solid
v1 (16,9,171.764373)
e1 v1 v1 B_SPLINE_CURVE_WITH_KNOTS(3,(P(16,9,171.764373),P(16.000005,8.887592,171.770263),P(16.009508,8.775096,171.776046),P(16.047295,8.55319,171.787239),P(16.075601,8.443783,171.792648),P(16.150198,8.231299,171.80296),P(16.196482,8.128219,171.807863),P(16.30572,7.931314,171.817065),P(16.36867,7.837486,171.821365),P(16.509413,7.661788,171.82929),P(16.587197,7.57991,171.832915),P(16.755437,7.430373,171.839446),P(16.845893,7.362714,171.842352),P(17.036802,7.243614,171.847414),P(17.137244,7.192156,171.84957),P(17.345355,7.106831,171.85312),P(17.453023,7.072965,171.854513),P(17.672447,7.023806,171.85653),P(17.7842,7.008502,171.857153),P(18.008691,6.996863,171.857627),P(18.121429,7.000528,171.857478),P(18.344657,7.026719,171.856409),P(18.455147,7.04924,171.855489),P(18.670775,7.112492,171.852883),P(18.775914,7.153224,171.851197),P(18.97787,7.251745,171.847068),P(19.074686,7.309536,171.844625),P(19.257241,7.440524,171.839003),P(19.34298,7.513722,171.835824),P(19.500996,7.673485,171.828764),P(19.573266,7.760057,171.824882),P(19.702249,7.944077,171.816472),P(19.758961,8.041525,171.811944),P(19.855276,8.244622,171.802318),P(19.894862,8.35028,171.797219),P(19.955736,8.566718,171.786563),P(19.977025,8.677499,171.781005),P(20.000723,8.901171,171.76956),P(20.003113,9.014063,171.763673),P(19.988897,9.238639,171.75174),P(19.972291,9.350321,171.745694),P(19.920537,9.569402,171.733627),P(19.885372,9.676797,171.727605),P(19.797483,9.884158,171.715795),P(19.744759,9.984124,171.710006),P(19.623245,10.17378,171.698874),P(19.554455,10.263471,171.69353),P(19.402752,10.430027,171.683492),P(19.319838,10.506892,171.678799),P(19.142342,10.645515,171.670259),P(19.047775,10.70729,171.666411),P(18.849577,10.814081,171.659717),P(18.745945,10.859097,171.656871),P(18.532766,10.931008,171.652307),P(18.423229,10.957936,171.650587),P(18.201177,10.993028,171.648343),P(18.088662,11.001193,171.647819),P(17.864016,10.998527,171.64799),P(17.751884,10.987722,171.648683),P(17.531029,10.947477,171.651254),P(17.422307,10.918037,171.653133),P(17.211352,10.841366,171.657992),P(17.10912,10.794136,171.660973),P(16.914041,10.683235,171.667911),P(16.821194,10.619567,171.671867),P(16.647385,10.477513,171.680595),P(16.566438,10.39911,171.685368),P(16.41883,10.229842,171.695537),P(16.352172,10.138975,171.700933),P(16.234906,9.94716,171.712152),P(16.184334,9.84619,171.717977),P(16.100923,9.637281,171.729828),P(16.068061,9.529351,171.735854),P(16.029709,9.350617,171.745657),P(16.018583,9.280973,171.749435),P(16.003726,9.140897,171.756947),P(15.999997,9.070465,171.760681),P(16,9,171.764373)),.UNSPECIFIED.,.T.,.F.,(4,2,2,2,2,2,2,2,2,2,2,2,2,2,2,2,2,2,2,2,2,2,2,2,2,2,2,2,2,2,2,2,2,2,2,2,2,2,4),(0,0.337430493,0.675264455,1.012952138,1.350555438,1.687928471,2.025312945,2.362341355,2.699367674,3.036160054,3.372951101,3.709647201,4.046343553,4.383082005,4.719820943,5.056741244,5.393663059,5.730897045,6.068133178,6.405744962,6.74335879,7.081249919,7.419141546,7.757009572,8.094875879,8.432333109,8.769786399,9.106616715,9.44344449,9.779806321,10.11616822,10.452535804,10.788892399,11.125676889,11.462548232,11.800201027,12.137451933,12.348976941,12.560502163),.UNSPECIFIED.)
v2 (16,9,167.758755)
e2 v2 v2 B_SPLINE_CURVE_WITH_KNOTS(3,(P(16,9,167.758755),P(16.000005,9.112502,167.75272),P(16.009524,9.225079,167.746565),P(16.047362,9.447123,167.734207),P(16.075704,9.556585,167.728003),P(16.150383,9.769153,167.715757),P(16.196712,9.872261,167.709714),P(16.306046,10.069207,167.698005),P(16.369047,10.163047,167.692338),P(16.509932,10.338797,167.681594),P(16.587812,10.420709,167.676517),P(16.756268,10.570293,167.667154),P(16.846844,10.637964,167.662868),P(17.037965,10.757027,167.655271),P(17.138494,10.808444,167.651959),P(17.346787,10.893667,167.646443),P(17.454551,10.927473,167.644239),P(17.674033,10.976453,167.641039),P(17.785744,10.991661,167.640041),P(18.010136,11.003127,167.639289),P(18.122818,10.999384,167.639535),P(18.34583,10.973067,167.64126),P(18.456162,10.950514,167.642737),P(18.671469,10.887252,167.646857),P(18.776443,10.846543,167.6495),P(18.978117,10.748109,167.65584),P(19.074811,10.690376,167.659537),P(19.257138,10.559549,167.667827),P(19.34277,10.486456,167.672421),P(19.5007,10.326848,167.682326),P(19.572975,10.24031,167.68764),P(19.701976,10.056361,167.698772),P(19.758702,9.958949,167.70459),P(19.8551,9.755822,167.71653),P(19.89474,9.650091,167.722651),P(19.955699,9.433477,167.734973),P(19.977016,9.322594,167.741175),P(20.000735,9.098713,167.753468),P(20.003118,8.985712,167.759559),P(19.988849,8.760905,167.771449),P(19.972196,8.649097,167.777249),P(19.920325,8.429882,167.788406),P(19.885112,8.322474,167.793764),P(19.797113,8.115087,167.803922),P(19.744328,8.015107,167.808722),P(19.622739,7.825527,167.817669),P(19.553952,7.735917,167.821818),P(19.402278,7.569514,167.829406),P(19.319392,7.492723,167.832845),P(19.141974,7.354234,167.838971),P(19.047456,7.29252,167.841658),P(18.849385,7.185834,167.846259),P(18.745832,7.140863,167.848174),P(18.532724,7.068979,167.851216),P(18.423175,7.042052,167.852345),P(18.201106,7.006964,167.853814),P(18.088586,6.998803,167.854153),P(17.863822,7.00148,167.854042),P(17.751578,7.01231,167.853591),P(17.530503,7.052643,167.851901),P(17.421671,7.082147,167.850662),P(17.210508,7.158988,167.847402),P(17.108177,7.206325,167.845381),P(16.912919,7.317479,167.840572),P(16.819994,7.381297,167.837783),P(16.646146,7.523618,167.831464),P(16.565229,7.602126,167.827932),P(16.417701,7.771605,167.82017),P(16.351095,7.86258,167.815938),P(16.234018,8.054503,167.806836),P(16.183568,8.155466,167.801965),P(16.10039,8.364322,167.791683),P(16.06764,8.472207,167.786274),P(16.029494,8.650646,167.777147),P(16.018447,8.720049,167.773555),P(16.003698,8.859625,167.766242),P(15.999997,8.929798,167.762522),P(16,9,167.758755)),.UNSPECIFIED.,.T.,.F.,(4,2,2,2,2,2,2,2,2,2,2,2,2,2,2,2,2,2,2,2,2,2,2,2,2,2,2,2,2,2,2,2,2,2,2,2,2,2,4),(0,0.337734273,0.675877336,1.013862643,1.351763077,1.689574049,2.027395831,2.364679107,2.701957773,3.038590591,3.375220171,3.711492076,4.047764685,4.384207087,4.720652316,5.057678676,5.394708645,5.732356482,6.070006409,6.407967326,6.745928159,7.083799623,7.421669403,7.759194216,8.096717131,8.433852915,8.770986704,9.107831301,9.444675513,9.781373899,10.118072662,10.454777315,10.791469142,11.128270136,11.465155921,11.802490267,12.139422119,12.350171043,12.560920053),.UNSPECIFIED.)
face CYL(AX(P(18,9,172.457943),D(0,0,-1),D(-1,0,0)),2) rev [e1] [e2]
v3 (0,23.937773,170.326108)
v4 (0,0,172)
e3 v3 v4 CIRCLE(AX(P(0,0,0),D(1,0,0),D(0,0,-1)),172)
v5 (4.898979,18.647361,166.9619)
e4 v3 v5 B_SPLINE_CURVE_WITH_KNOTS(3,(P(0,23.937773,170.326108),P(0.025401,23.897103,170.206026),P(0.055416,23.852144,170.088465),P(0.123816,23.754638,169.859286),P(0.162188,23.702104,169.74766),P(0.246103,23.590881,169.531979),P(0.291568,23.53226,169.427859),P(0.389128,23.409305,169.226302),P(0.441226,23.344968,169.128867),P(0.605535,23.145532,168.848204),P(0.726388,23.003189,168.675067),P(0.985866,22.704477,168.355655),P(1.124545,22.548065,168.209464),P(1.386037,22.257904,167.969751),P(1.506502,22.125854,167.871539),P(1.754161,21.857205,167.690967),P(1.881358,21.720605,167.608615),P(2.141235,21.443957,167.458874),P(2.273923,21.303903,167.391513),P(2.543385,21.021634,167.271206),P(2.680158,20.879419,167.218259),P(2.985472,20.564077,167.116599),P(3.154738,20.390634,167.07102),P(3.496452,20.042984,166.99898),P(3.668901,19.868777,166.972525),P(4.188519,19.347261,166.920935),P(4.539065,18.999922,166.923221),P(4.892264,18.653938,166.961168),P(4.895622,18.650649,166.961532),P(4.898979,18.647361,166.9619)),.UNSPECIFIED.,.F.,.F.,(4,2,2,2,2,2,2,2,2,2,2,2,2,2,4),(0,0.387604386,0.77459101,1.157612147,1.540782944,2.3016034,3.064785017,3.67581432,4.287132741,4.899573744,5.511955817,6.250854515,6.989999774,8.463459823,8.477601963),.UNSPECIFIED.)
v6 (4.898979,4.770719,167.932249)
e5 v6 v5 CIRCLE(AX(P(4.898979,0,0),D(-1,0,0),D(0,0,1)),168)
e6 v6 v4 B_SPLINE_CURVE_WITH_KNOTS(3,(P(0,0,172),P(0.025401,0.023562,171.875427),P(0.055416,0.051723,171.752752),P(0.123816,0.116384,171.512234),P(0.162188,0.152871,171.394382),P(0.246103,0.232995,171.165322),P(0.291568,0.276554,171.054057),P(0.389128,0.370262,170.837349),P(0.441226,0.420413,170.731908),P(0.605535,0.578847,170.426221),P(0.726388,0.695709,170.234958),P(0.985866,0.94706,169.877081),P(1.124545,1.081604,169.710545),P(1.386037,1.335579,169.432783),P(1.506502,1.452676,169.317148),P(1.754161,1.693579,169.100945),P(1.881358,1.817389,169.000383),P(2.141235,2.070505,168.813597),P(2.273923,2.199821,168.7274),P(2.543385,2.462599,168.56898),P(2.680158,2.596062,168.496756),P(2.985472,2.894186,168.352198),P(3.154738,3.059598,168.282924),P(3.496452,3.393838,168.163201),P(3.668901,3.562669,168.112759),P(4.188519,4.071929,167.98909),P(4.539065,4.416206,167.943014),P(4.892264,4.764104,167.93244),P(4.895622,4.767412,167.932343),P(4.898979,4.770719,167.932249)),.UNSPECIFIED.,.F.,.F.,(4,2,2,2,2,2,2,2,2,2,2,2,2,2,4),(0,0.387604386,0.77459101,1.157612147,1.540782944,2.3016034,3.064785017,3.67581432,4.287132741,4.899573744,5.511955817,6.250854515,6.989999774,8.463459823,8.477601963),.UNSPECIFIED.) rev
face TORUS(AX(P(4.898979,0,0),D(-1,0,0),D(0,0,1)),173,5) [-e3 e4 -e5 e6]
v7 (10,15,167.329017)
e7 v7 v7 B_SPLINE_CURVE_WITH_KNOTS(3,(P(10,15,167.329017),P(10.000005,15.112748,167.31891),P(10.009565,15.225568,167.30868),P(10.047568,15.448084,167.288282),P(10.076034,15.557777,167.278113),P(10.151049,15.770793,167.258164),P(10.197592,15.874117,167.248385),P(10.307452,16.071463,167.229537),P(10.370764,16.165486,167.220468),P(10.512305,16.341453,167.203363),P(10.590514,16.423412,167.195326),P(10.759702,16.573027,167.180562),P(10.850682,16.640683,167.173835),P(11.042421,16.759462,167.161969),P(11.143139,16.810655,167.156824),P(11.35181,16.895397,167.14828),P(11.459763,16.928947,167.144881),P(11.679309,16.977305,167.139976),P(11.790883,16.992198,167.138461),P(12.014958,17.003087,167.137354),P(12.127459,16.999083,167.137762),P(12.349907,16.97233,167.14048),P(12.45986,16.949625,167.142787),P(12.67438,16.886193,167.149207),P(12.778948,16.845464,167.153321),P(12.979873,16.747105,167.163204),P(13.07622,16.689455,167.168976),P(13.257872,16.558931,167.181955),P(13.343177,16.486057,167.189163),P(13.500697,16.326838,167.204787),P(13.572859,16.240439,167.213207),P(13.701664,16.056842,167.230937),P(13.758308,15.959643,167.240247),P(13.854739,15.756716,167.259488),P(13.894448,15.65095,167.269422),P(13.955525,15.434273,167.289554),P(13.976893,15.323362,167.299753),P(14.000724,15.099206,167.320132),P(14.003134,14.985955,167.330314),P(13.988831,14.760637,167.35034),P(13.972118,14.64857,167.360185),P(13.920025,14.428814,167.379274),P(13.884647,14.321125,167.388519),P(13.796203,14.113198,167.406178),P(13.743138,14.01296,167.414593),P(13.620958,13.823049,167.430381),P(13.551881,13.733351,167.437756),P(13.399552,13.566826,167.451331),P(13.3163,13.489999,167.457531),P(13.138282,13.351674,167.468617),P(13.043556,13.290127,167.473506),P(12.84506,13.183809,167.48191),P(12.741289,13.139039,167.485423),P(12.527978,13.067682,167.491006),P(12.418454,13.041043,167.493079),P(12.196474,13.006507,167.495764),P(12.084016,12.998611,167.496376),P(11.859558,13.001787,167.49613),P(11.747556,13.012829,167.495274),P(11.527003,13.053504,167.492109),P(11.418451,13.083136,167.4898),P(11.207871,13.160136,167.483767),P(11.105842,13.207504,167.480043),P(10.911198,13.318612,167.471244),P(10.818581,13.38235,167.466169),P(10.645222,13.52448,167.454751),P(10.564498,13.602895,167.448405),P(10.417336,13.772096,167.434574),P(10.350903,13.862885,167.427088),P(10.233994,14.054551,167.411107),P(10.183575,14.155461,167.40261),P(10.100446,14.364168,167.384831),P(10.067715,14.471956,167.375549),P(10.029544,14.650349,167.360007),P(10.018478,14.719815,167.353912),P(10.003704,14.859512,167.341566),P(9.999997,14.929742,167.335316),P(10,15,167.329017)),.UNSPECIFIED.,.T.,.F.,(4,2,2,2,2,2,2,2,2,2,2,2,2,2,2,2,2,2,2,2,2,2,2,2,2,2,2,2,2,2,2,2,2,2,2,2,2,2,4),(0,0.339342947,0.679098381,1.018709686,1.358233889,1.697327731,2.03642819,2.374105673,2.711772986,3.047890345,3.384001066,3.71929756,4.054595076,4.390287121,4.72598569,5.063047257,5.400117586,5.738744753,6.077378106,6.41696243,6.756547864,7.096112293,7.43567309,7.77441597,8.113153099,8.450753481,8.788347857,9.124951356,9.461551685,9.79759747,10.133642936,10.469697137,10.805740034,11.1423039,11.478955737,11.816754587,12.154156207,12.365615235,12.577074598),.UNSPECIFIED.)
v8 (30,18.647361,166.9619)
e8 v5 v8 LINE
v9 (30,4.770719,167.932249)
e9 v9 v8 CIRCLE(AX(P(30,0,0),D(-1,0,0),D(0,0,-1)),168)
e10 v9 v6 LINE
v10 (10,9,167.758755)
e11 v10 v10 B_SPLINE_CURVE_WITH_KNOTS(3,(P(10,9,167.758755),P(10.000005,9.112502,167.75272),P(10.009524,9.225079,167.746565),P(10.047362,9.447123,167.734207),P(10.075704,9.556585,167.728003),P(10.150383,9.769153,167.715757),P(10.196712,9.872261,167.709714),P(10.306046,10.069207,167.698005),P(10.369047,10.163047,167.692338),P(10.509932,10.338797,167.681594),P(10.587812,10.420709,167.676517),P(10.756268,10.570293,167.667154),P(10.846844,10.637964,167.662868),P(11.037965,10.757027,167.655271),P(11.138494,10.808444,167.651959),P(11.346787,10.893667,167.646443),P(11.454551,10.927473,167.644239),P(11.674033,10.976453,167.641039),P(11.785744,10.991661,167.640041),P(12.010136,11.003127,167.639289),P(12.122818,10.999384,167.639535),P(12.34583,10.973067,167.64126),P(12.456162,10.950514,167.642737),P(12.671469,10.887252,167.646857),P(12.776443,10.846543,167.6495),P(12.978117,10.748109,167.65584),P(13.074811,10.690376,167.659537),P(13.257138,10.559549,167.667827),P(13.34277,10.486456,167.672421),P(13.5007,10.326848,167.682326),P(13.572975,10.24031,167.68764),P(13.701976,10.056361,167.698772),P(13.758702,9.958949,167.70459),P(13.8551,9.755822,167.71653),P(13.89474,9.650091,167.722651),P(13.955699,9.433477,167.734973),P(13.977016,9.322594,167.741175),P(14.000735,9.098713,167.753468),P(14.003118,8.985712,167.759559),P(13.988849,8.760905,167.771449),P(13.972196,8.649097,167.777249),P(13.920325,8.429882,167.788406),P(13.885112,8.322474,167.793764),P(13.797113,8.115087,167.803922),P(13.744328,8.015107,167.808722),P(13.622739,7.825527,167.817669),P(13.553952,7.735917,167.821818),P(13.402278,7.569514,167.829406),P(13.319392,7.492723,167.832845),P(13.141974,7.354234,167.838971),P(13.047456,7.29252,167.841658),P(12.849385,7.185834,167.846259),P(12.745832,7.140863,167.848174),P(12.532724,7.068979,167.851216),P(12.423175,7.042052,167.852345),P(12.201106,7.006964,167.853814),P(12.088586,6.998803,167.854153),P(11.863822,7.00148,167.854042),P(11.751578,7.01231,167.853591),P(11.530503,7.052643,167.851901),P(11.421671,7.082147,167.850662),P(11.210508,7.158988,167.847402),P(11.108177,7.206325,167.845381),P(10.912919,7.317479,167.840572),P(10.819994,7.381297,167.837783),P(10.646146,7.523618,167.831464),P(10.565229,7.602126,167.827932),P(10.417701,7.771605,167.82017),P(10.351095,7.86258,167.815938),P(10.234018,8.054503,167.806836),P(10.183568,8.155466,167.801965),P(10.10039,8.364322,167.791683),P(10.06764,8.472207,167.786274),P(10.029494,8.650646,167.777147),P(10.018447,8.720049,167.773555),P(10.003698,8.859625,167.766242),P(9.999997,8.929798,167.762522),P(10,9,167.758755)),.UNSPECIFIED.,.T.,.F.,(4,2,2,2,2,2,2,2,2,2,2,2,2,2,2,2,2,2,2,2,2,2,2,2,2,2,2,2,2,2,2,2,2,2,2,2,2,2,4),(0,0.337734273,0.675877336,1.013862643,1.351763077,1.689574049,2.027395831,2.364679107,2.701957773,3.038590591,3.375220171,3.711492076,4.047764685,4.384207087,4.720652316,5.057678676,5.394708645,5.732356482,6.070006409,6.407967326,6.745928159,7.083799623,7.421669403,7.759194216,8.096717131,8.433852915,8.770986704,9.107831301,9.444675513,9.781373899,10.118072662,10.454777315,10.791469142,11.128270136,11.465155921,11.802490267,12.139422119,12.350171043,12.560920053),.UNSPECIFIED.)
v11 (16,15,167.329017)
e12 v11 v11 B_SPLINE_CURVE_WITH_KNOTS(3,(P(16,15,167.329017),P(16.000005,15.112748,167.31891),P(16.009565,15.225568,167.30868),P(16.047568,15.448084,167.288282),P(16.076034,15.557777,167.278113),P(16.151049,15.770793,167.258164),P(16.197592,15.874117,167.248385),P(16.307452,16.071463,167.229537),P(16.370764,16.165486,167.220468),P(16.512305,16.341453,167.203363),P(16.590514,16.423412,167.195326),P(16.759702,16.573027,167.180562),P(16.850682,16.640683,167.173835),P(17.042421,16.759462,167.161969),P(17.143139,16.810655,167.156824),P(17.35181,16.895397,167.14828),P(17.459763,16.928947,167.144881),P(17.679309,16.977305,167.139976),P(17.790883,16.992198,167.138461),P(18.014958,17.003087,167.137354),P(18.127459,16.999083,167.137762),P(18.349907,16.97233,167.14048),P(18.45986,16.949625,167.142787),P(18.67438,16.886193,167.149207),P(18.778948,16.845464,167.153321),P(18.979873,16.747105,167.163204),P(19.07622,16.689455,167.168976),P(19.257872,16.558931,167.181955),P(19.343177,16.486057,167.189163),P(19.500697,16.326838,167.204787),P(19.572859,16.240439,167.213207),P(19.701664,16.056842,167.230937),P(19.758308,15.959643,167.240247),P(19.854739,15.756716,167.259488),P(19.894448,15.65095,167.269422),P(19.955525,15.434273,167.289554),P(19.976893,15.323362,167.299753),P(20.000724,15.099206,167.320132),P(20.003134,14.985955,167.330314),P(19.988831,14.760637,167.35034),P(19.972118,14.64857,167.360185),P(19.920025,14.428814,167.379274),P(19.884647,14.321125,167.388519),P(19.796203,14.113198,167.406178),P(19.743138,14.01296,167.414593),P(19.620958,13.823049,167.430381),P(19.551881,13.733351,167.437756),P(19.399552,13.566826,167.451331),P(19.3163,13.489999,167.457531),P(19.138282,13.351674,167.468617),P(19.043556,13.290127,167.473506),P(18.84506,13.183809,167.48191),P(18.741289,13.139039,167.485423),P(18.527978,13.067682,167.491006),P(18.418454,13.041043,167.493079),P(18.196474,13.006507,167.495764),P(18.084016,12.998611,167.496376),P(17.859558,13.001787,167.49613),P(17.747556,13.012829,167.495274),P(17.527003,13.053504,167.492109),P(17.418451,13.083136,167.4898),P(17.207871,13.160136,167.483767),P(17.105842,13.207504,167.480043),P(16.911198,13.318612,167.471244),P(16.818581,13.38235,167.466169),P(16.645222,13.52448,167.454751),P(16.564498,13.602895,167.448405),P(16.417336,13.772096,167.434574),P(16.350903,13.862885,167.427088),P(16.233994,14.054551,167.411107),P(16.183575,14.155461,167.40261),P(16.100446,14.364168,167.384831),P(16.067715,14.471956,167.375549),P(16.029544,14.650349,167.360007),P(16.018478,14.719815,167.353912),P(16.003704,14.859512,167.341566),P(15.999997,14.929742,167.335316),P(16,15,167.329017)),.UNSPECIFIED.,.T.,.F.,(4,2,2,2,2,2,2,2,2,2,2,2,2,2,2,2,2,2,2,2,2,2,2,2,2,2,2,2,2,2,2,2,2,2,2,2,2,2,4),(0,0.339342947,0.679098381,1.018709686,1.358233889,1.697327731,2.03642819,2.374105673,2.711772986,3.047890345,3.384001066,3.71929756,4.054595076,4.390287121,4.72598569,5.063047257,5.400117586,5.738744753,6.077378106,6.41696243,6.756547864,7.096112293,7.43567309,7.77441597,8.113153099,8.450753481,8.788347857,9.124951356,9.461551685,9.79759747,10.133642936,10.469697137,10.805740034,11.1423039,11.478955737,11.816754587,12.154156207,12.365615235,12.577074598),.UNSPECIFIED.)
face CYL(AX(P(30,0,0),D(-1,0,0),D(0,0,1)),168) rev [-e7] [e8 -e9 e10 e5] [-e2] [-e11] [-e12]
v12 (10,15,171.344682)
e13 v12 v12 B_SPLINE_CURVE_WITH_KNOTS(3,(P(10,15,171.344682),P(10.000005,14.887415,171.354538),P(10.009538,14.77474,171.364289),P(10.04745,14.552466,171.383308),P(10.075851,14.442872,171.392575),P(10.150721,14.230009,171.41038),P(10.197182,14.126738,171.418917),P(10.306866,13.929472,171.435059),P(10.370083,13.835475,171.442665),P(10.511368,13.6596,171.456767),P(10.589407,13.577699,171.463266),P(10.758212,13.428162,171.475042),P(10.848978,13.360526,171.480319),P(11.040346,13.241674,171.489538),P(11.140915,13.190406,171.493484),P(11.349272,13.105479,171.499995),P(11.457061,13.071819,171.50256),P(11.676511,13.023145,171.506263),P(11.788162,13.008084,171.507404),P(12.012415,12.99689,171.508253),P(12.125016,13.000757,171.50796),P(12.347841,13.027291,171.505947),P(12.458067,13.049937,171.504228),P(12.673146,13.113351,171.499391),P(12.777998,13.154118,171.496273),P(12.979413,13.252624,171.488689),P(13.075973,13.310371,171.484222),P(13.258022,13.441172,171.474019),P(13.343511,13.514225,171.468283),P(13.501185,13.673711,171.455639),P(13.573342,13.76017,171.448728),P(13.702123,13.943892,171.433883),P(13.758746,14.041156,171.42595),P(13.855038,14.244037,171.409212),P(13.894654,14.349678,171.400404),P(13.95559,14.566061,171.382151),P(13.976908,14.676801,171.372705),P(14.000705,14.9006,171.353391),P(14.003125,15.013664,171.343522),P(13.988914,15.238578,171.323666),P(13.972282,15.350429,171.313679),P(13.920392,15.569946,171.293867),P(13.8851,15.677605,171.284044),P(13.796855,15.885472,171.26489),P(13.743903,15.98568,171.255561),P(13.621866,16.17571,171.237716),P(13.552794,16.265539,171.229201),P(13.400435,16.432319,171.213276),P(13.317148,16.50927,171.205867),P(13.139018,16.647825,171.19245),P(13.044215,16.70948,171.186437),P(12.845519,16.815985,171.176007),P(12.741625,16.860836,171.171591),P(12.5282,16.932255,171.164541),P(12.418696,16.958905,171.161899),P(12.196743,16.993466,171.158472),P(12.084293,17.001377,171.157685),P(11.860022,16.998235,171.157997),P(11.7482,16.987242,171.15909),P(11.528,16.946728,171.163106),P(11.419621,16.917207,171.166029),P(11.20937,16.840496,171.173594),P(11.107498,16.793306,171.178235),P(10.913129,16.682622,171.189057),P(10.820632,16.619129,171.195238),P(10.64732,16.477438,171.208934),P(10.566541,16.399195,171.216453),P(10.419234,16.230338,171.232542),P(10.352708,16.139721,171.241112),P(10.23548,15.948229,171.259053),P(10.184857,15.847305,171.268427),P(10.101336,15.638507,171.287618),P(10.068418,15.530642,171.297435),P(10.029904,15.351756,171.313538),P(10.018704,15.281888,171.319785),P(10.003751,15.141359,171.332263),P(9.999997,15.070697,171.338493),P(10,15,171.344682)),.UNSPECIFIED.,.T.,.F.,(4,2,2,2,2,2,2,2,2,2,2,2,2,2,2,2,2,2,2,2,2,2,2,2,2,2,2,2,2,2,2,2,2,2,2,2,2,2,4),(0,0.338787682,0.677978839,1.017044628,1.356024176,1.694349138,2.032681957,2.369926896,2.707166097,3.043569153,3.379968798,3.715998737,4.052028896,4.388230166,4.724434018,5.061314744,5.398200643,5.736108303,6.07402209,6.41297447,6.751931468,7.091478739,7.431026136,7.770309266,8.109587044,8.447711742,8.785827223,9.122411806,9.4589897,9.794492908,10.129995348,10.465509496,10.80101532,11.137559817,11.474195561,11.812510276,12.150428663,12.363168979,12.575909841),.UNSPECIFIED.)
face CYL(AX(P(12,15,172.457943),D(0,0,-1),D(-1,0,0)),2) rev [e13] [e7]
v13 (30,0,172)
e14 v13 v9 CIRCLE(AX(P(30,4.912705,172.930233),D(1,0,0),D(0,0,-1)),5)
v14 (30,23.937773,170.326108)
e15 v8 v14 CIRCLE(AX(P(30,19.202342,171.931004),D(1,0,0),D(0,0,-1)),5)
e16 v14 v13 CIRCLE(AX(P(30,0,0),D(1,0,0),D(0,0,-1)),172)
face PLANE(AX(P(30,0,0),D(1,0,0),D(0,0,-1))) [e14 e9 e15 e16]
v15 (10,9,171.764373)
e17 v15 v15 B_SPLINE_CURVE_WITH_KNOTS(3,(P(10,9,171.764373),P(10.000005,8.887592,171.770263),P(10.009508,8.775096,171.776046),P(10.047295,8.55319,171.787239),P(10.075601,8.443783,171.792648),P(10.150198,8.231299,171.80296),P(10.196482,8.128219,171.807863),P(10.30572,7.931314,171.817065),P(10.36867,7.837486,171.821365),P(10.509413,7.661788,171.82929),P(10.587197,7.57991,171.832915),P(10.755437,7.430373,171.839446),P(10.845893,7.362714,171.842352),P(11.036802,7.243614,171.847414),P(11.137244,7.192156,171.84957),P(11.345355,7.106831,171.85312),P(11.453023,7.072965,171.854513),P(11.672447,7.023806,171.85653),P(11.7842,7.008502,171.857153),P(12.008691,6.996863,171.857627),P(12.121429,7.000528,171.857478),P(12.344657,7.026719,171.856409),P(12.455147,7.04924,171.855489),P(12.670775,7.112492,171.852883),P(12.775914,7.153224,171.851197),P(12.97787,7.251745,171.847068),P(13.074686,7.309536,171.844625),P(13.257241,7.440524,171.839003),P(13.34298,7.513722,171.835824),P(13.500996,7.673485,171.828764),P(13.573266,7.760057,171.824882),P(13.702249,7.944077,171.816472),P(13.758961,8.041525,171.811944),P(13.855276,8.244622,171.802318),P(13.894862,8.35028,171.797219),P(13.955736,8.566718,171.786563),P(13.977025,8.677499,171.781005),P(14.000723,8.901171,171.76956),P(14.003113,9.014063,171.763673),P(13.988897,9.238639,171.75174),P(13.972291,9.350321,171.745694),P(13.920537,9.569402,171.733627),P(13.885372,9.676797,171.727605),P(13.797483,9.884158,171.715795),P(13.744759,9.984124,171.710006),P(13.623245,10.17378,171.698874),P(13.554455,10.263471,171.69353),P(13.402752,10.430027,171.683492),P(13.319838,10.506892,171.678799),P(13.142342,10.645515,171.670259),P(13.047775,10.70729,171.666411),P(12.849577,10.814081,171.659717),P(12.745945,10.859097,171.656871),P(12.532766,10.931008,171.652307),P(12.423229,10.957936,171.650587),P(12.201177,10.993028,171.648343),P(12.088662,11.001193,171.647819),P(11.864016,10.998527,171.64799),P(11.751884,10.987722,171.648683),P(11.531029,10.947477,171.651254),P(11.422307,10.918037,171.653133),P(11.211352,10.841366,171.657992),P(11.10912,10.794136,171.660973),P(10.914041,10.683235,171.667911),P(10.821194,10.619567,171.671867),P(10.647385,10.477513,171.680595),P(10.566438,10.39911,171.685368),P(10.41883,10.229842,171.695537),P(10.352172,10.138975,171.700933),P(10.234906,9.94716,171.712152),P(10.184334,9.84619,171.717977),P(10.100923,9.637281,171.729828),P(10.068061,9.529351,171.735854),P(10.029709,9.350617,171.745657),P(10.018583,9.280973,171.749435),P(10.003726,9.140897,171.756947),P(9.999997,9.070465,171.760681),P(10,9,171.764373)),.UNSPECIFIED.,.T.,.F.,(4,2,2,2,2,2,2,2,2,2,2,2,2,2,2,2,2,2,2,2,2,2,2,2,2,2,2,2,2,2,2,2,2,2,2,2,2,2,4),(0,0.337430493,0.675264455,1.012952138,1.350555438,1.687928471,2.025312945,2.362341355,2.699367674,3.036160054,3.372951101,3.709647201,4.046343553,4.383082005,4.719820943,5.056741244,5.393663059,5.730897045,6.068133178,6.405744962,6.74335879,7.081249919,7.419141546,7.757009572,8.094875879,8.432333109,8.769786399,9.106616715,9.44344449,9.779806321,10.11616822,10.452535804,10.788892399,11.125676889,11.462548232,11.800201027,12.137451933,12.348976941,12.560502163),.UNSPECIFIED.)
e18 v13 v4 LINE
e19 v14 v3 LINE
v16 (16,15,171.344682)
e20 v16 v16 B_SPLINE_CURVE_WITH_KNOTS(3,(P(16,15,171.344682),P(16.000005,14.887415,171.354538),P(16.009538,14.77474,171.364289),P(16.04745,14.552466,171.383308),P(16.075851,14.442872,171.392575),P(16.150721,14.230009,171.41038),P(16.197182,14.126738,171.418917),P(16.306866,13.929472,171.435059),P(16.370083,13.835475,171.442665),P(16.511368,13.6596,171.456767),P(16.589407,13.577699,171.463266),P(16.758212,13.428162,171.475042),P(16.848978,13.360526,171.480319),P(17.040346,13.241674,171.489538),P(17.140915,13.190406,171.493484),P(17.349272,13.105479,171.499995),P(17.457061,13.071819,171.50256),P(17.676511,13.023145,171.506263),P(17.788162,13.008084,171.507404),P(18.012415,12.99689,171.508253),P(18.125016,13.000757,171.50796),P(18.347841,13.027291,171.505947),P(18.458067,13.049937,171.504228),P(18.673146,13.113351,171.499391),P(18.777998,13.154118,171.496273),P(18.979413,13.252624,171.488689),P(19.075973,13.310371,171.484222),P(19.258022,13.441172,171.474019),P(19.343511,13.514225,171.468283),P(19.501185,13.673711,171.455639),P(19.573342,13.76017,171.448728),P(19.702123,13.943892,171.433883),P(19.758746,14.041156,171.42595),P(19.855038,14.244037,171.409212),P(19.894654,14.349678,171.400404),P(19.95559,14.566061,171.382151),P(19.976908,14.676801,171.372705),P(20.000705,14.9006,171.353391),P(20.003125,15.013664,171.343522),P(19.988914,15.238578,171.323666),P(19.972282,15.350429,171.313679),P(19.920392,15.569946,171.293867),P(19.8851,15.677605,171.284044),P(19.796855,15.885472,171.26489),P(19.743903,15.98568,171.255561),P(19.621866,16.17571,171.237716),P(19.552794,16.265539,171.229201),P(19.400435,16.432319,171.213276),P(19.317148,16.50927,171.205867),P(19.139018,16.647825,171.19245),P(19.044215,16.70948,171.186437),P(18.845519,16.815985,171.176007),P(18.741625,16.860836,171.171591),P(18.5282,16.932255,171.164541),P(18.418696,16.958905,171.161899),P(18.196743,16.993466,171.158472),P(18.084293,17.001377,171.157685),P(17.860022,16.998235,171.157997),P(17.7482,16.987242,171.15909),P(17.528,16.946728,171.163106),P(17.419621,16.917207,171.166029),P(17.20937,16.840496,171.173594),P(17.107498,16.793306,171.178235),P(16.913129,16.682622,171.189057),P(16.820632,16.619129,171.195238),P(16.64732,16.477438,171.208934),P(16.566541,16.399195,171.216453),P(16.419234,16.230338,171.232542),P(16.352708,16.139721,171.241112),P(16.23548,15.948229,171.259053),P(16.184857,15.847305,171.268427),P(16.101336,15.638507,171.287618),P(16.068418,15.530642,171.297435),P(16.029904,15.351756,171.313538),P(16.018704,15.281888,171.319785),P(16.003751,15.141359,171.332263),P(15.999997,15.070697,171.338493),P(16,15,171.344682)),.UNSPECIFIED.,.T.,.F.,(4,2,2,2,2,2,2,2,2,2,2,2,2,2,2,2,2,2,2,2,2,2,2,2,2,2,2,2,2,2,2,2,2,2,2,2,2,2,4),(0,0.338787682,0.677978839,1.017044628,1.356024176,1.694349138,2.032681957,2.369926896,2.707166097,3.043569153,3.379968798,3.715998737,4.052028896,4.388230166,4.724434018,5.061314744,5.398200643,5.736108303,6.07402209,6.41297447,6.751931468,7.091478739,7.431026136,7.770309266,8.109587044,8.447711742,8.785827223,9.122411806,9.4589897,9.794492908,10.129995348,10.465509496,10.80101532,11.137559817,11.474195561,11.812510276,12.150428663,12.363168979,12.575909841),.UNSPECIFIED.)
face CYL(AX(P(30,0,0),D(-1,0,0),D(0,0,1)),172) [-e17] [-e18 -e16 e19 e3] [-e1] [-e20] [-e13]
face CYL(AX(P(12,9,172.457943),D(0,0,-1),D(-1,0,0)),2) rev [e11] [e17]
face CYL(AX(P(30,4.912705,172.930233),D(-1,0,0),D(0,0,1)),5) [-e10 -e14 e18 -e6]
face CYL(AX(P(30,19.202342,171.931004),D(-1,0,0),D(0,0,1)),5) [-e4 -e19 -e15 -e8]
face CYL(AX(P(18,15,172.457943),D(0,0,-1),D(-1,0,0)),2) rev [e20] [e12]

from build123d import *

# Parameters (mm, degrees)
SALIENTE_EXTRUIR1_DEPTH = 30
REDONDEO1_R             = 5
CROQUIS2_R              = 2
CORTAR_EXTRUIR1_DEPTH   = 41.197257902


with BuildPart() as part:
    # Croquis1 → Saliente-Extruir1 (new body)
    with BuildSketch(Plane(origin=(0, 0, 0), x_dir=(0, 0, -1), z_dir=(1, 0, 0))):
        with BuildLine():
            Line((-172, 0), (-168, 0))
            ThreePointArc((-168, 0), (-167.590760444, 11.719087589), (-166.365035549, 23.381080961))
            Line((-166.365035549, 23.381080961), (-170.326107824, 23.937773365))
            ThreePointArc((-170.326107824, 23.937773365), (-171.581016645, 11.998113484), (-172, 0))
        make_face()
    extrude(amount=SALIENTE_EXTRUIR1_DEPTH)

    # Redondeo1
    # the kernel refuses this fillet: 5 mm, written as the material it takes off along each edge
    with BuildSketch(Plane(origin=(-11.928000159, 0, 168), x_dir=(0, 0, 1), z_dir=(1, 0, 0))) as redondeo1_piece_1:
        with BuildLine():
            CenterArc((4.930232558, -4.912704692), REDONDEO1_R, 100.722152416, 77.650592735)
            Line((-0.067751042, -4.770719007), (-0.167710714, -4.767879293))
            ThreePointArc((-0.167710714, -4.767879293), (-0.116928532, -2.384180032), (-0.1, 0))
            Line((-0.1, 0), (0, 0.1))
            ThreePointArc((0, 0.1), (2, 0.1), (3.981395349, 0.098254094))
            Line((3.981395349, 0.098254094), (4, 0))
        make_face()
    redondeo1_piece_1_solid = extrude(amount=53.856000318, mode=Mode.PRIVATE)
    with BuildSketch(Plane(origin=(0, 0, 0), x_dir=(0, -0.07283715429145175, 0.9973438469027236), z_dir=(0, -0.9973438469027236, -0.07283715429145175))) as redondeo1_piece_2:
        with BuildLine():
            CenterArc((173, -4.898979486), REDONDEO1_R, 101.536959033, 78.463040967)
            Line((172, 0), (171.98, 0.09797959))
            ThreePointArc((171.98, 0.09797959), (170, 0.1), (168, 0.1))
            Line((168, 0.1), (167.9, 0))
            Line((167.9, 0), (167.9, -4.898979486))
            Line((167.9, -4.898979486), (168, -4.898979486))
        make_face()
    redondeo1_piece_2_solid = revolve(axis=Axis((0, 0, 0), (-1, 0, 0)), revolution_arc=16.353920807, mode=Mode.PRIVATE)
    with BuildSketch(Plane(origin=(-11.928000159, 23.381080961, 166.365035549), x_dir=(0, -0.9921444829388189, 0.12509726205662378), z_dir=(1, 0, 0))) as redondeo1_piece_3:
        with BuildLine():
            CenterArc((4.842200065, -4.999495875), REDONDEO1_R, 90.813627425, 77.650592735)
            Line((-0.056800001, -3.9995967), (-0.154780002, -3.979598716))
            ThreePointArc((-0.154780002, -3.979598716), (-0.128389918, -1.99837835), (-0.099989917, 0.00142))
            Line((-0.099989917, 0.00142), (0.00142, 0.099989917))
            ThreePointArc((0.00142, 0.099989917), (2.385600032, 0.083061386), (4.769780064, 0.099989917))
            Line((4.769780064, 0.099989917), (4.771200064, 0))
        make_face()
    redondeo1_piece_3_solid = extrude(amount=53.856000318, mode=Mode.PRIVATE)
    add([redondeo1_piece_1_solid, redondeo1_piece_2_solid, redondeo1_piece_3_solid], mode=Mode.SUBTRACT)

    # Croquis2 → Cortar-Extruir1 (cut, through all)
    with BuildSketch(Plane.XY.offset(160.05)):
        with Locations(Location((18, 15, 0), (0, 0, 180))):
            Circle(CROQUIS2_R)
        with Locations(Location((12, 15, 0), (0, 0, 180))):
            Circle(CROQUIS2_R)
        with Locations(Location((18, 9, 0), (0, 0, 180))):
            Circle(CROQUIS2_R)
        with Locations(Location((12, 9, 0), (0, 0, 180))):
            Circle(CROQUIS2_R)
    extrude(amount=CORTAR_EXTRUIR1_DEPTH, mode=Mode.SUBTRACT)


solid = part.part
